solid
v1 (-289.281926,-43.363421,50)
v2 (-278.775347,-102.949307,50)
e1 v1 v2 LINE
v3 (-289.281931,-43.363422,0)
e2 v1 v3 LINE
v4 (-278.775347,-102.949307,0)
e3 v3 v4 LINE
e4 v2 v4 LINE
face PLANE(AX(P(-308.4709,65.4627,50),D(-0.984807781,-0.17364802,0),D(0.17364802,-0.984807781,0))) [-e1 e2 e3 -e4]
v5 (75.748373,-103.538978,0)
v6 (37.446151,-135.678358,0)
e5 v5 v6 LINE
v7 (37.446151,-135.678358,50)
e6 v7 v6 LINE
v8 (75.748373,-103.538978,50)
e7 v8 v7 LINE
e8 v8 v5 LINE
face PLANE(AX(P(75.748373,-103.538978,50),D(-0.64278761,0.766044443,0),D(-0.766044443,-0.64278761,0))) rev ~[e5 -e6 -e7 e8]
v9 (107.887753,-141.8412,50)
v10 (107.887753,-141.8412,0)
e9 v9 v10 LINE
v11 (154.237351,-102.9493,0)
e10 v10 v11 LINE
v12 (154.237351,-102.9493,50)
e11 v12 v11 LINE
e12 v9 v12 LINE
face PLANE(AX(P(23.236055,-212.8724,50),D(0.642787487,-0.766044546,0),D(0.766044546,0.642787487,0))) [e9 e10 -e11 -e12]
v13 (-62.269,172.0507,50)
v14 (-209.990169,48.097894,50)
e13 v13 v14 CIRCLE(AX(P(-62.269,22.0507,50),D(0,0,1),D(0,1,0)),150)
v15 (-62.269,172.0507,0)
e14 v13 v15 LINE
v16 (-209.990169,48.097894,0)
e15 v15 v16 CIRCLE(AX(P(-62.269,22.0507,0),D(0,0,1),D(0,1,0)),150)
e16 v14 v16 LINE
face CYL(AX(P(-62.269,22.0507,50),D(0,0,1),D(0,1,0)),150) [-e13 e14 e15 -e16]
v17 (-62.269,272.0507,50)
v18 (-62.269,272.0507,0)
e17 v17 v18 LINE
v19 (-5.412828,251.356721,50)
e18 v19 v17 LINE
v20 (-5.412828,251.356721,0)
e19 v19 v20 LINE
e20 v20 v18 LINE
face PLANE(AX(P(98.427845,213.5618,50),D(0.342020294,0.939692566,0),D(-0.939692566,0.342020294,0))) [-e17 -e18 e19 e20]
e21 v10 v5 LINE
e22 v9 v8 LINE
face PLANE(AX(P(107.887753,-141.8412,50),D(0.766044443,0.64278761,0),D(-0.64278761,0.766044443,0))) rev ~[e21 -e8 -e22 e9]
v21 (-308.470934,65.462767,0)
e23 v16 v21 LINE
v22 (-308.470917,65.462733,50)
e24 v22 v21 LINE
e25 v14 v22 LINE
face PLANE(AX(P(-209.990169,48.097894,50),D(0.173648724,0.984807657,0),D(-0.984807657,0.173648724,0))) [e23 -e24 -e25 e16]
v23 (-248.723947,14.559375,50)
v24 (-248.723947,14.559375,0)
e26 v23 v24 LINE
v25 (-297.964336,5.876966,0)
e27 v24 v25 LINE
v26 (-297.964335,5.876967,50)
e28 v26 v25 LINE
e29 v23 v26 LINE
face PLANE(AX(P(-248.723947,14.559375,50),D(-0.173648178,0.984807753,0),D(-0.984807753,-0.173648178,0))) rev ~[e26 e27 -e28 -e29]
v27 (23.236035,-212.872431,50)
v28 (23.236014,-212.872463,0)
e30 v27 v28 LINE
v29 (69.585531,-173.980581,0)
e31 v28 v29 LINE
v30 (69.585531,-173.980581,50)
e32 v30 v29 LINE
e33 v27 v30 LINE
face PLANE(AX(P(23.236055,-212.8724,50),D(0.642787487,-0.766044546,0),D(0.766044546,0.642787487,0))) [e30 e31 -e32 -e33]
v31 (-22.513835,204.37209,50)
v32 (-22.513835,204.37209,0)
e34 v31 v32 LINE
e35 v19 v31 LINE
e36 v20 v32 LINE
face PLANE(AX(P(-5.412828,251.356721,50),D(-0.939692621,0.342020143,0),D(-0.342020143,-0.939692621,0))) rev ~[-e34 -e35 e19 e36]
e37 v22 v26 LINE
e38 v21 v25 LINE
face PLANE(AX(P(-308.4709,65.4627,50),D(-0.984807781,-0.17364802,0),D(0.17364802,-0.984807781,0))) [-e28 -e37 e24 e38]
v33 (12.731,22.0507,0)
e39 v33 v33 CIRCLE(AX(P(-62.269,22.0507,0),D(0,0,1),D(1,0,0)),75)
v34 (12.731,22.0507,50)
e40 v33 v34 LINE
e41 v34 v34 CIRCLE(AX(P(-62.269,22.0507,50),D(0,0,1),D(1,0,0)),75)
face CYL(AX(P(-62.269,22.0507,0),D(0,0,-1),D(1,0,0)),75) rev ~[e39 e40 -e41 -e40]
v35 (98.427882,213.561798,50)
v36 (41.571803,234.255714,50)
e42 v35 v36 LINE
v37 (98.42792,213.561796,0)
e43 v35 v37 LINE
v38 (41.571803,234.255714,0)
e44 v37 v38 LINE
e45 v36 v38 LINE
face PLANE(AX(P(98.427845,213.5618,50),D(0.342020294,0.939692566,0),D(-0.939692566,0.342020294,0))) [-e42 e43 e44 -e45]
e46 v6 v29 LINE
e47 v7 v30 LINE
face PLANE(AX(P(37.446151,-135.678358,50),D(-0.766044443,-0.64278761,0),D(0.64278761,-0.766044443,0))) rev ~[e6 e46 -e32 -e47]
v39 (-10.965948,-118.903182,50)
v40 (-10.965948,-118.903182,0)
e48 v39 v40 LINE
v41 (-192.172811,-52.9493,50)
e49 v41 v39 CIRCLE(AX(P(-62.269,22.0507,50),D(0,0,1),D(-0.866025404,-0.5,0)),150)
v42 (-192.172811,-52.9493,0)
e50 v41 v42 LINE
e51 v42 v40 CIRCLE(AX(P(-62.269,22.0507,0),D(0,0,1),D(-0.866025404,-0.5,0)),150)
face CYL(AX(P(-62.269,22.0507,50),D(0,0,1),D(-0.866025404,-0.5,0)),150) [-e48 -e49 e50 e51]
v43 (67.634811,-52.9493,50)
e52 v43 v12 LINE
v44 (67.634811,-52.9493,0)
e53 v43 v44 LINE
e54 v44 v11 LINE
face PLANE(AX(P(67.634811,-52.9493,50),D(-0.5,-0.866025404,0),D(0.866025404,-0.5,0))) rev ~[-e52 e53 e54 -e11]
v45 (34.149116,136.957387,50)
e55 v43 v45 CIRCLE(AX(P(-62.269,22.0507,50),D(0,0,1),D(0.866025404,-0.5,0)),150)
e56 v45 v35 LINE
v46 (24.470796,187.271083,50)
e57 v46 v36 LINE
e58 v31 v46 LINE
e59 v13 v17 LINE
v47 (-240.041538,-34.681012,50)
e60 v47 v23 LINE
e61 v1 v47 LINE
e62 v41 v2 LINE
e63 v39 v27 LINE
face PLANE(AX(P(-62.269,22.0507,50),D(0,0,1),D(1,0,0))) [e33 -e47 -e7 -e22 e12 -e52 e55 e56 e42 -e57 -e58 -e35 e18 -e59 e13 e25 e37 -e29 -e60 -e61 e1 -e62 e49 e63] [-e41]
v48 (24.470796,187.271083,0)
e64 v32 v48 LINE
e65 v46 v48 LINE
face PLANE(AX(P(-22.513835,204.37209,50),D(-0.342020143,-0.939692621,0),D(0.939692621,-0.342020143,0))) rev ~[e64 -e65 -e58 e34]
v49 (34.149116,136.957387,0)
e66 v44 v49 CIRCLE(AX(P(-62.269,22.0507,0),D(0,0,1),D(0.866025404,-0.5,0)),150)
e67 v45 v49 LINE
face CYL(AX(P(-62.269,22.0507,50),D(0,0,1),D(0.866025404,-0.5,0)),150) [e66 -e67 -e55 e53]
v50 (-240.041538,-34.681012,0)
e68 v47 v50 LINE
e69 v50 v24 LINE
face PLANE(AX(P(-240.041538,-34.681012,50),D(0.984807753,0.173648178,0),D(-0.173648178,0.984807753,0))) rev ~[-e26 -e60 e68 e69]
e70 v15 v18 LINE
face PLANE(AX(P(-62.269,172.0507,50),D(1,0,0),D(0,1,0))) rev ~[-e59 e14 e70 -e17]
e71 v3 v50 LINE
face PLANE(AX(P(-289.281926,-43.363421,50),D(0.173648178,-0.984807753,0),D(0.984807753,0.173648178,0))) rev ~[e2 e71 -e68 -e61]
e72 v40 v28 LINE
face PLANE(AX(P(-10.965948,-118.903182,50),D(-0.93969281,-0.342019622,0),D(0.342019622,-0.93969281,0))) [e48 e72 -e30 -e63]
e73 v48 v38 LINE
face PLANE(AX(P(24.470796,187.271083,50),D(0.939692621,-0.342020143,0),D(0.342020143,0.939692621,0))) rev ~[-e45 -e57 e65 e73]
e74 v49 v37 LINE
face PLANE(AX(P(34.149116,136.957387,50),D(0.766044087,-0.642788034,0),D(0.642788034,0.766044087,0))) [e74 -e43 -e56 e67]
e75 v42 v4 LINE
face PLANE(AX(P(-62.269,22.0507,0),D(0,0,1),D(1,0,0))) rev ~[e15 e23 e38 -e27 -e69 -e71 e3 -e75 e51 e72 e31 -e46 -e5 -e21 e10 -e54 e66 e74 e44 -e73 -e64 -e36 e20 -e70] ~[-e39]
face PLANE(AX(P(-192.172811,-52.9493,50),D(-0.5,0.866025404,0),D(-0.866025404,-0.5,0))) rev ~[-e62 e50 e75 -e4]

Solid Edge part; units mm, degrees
sketch "Sketch1" plane through (0, 0, 0) normal (0, 0, 1) x (1, 0, 0)
  circle A0 centre (-62.269, 22.0507) radius 250
  circle A1 centre (-62.269, 22.0507) radius 75
extrude "Protrusion1" add sketch "Sketch1" along normal blind 50
sketch "Sketch2" plane through (-62.269, 22.0507, 50) normal (0, 0, 1) x (0, 1, 0)
  arc A0 (150, 0) -> (26.0472, 147.7212) centre (0, 0) ccw
  line L0 (26.0472, 147.7212) -> (52.0945, 295.4423)
  line L1 (52.0945, 295.4423) -> (379.3774, 186.8257)
  line L2 (379.3774, 186.8257) -> (365.0673, 0)
  line L3 (150, 0) -> (365.0673, 0)
extrude "Cutout1" cut sketch "Sketch2" against normal through all
sketch "Sketch3" plane through (-69.8074, 22.0507, 50) normal (0, 0, 1) x (0, 1, 0)
  line L0 (43.412, 238.6635) -> (-252.0303, 186.5691)
  line L1 (-252.0303, 186.5691) -> (-35.9633, 306.8202)
  line L2 (-35.9633, 306.8202) -> (43.412, 238.6635)
extrude "Cutout2" cut sketch "Sketch3" against normal through all
sketch "Sketch4" plane through (-77.1168, 29.5891, 50) normal (0, 0, 1) x (0.9396926, -0.3420201, 0)
  line L0 (-8.4693, 182.9176) -> (41.5307, 182.9176)
  line L1 (41.5307, 182.9176) -> (41.5307, 232.9176)
  line L2 (41.5307, 232.9176) -> (-8.4693, 232.9176)
  line L3 (-8.4693, 232.9176) -> (-8.4693, 182.9176)
  dimension "D1" = 50
extrude "Cutout3" cut sketch "Sketch4" against normal through all
pattern_circular "Pattern1" count 3 over 360 about axis through (-62.269, 22.0507, 50) along (0, 0, -1) of "Cutout1", "Cutout3", "Cutout2"
